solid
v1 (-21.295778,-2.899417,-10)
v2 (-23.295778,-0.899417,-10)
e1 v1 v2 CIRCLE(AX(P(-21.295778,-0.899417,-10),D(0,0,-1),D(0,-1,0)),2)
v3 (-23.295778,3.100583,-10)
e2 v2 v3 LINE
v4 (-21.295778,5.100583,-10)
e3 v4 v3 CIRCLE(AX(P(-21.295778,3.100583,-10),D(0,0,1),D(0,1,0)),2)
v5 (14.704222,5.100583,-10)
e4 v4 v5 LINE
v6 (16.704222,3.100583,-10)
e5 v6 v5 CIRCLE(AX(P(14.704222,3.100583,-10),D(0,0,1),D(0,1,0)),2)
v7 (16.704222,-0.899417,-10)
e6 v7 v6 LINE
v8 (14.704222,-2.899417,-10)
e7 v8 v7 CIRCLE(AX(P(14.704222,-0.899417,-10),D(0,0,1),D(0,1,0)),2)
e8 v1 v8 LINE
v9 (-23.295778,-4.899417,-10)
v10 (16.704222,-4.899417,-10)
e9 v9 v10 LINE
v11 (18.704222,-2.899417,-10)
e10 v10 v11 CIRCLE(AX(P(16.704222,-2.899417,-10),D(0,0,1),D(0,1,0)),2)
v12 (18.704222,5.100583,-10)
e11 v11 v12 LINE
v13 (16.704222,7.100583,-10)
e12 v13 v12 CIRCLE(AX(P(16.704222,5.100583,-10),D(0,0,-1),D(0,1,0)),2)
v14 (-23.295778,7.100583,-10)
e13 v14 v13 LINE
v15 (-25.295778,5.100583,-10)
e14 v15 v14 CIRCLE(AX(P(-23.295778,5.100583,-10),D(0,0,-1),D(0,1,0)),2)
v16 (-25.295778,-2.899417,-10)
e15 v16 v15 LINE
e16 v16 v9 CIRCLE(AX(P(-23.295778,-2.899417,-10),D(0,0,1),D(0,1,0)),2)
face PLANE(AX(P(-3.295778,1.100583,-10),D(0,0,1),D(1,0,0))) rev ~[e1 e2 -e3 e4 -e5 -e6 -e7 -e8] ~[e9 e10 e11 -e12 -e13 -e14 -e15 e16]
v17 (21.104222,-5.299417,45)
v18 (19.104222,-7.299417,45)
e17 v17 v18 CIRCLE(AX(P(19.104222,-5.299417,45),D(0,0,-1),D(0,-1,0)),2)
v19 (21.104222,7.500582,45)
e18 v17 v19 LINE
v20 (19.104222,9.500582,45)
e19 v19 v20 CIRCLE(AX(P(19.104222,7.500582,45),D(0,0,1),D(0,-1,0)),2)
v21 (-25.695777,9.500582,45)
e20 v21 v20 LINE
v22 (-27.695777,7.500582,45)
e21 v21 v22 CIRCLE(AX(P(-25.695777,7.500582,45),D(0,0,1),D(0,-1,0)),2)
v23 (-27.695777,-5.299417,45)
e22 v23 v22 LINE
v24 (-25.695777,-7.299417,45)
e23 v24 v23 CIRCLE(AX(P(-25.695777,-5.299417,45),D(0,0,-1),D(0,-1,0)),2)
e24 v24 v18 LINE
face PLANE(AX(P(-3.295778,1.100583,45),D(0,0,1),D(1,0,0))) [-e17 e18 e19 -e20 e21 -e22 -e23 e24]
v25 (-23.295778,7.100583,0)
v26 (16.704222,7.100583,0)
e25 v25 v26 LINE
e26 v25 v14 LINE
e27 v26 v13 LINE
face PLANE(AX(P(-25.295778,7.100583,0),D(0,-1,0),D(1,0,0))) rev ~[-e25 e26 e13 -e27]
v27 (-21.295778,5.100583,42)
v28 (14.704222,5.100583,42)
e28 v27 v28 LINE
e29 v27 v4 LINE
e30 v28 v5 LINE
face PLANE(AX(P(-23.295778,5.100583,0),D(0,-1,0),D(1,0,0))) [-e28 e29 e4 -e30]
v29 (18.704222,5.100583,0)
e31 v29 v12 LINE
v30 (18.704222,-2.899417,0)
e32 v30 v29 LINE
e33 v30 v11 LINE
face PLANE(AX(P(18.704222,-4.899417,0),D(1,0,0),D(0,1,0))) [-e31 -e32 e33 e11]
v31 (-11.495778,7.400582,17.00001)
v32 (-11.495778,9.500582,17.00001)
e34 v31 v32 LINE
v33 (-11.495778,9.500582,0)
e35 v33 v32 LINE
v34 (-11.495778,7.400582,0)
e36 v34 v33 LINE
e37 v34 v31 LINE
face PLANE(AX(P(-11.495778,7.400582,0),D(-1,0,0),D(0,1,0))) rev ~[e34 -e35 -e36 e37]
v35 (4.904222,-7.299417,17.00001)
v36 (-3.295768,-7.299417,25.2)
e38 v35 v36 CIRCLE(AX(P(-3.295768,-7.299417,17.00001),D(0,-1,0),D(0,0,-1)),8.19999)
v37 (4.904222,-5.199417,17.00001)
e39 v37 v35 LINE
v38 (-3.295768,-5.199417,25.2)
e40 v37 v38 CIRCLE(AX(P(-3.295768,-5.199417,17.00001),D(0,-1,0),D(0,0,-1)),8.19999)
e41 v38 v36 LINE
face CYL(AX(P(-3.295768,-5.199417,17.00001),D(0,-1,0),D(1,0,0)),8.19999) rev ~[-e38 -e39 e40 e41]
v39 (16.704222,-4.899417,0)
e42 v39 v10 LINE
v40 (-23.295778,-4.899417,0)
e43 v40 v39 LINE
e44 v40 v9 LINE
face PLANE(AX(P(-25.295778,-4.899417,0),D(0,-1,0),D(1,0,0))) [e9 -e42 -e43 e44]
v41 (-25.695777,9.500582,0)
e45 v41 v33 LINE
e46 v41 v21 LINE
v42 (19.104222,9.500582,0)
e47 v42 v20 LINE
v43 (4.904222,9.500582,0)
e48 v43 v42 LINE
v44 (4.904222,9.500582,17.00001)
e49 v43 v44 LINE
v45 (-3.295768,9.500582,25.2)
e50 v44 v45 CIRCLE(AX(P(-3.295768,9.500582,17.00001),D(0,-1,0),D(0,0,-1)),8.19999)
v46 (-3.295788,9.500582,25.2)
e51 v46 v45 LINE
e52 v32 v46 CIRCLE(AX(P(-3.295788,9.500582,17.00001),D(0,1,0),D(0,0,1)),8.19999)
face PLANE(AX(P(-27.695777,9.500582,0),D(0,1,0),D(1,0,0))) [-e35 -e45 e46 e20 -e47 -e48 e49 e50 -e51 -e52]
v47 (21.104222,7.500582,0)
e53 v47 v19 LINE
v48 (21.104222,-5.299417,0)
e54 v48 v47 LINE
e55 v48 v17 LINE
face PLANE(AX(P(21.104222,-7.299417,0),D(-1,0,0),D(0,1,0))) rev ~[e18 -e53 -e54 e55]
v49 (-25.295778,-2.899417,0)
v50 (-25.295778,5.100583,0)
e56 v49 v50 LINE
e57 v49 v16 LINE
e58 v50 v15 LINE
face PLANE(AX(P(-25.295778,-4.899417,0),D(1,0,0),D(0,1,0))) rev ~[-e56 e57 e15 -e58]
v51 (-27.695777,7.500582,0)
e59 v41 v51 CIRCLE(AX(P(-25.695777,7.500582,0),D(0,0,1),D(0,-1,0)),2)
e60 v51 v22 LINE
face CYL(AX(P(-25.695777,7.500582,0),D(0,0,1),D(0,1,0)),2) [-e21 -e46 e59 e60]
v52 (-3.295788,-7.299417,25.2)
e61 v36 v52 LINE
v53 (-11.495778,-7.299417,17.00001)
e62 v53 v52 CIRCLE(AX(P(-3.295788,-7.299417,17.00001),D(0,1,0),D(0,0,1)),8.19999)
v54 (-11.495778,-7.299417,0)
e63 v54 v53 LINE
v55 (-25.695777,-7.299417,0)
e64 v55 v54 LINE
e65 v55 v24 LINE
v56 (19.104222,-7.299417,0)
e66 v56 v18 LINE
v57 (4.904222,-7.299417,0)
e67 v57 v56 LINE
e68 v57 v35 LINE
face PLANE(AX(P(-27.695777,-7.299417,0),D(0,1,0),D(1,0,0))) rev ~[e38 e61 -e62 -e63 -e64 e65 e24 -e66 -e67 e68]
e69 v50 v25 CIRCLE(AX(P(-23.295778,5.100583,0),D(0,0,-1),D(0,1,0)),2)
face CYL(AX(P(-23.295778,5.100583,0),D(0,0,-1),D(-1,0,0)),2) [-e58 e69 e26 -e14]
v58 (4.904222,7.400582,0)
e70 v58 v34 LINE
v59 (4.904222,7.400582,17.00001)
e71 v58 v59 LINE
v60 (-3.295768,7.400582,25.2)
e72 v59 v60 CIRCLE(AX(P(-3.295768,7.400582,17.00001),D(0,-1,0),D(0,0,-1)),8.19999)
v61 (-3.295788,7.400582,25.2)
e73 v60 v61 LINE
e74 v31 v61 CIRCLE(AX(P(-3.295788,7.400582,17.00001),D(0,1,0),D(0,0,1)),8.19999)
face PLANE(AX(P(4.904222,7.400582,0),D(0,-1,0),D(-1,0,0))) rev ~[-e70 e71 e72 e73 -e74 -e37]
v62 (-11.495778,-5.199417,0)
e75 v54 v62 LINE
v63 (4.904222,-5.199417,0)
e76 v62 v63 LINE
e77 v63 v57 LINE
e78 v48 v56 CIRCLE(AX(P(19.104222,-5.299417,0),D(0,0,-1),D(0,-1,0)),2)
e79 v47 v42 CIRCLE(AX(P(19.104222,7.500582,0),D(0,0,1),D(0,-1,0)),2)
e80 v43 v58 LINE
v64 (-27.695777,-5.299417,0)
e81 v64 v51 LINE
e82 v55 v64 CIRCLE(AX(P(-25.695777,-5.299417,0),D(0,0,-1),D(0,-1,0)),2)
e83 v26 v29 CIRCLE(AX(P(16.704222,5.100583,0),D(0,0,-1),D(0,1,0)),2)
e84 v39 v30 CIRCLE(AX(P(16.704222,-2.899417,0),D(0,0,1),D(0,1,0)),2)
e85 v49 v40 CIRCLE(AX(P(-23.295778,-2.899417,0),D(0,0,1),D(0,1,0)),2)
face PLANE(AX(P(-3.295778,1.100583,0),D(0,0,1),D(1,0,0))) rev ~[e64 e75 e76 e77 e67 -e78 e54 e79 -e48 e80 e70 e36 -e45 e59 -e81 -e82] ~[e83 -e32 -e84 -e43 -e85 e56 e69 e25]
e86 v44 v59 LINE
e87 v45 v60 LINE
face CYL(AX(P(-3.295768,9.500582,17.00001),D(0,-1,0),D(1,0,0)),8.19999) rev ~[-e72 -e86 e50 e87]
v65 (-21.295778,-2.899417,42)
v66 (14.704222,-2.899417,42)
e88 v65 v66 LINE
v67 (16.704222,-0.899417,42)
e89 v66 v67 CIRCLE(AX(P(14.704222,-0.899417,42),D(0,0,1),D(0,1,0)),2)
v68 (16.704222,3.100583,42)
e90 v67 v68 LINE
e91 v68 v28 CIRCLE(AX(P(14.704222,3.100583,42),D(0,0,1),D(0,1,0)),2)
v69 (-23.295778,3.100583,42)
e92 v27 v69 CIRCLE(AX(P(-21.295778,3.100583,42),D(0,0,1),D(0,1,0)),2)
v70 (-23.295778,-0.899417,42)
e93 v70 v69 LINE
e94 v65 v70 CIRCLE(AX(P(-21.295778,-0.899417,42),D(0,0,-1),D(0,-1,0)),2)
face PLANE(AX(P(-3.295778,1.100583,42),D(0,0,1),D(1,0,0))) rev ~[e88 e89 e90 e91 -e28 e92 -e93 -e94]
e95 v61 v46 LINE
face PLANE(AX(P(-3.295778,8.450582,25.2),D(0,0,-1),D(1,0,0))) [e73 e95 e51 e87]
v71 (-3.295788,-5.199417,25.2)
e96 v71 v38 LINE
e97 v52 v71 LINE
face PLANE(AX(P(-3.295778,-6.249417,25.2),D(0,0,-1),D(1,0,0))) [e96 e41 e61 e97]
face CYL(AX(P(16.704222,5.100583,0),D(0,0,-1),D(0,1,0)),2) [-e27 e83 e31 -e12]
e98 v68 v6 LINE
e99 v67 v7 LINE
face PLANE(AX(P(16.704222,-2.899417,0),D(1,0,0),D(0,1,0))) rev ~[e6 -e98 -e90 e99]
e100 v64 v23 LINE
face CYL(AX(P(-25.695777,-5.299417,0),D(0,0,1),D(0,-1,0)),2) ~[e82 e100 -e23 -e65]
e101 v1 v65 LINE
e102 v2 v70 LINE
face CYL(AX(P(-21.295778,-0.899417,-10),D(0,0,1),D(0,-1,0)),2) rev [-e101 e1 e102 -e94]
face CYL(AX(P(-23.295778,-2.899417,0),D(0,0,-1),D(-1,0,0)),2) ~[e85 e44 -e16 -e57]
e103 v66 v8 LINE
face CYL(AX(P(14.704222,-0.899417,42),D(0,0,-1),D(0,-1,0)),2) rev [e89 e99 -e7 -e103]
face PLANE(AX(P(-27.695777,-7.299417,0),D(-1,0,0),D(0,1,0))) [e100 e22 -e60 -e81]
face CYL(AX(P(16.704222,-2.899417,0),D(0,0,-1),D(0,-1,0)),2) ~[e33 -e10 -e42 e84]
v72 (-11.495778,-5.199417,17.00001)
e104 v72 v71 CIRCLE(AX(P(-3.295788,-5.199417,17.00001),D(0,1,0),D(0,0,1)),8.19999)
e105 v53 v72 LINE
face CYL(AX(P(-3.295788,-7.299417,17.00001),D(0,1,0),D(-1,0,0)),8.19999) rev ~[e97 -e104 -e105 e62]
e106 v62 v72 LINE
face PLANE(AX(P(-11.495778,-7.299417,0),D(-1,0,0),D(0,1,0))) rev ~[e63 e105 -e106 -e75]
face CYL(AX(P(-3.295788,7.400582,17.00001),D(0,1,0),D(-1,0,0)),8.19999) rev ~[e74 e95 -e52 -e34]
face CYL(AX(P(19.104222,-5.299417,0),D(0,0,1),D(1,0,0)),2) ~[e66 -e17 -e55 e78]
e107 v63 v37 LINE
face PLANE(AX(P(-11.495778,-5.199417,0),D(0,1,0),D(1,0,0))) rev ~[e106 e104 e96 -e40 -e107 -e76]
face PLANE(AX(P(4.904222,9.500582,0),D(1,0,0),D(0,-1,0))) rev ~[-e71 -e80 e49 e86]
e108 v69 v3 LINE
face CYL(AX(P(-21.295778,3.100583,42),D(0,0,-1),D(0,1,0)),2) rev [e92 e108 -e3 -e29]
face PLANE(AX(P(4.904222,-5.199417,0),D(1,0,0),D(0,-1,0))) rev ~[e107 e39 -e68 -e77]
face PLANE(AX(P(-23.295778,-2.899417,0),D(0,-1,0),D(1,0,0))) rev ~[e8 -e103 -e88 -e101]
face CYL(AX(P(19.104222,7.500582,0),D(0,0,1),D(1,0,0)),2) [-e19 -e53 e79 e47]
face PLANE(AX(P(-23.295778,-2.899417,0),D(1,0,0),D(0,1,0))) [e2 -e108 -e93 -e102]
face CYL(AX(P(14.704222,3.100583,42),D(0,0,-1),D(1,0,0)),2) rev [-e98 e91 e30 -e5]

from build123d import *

# Parameters (mm, degrees)
F0_W     = 48.799998641
F0_H     = 16.799998641
F0_W_2   = 44.799998641
F0_H_2   = 12.799998641
F0_W_3   = 44
F0_H_3   = 12
F0_W_4   = 40
F0_H_4   = 8
F1_DEPTH = 45
F2_DEPTH = 42
F3_DEPTH = 10
F4_R     = 2
F5_R     = 2
F6_R     = 2
F8_DEPTH = 25.2
F9_R     = 8.19999


# Not quite as in the source:
# - a fillet or chamfer is up to 0.001 mm smaller than in the source, because OpenCascade refuses the exact size


with BuildPart() as f1:
    # F0 (on Top) → F1 (new body)
    with BuildSketch(Plane.XY):
        with Locations((-3.2957775742, 1.1005828176)):
            Rectangle(F0_W, F0_H)
        with Locations((-3.2957775742, 1.1005828176)):
            Rectangle(F0_W_2, F0_H_2, mode=Mode.SUBTRACT)
        with Locations((-3.2957775742, 1.1005828176)):
            Rectangle(F0_W_2, F0_H_2)
        with Locations((-3.2957775742, 1.1005828176)):
            Rectangle(F0_W_3, F0_H_3, mode=Mode.SUBTRACT)
        with Locations((-3.2957775742, 1.1005828176)):
            Rectangle(F0_W_3, F0_H_3)
        with Locations((-3.2957775742, 1.1005828176)):
            Rectangle(F0_W_4, F0_H_4, mode=Mode.SUBTRACT)
        with Locations((-3.2957775742, 1.1005828176)):
            Rectangle(F0_W_4, F0_H_4)
    extrude(amount=F1_DEPTH)

    # F0 (on Top) → F2 (cut)
    with BuildSketch(Plane.XY):
        with Locations((-3.2957775742, 1.1005828176)):
            Rectangle(F0_W_4, F0_H_4)
    extrude(amount=F2_DEPTH, mode=Mode.SUBTRACT)

    # F0 (on Top) → F3 (join)
    with BuildSketch(Plane.XY):
        with Locations((-3.2957775742, 1.1005828176)):
            Rectangle(F0_W_3, F0_H_3)
        with Locations((-3.2957775742, 1.1005828176)):
            Rectangle(F0_W_4, F0_H_4, mode=Mode.SUBTRACT)
    extrude(amount=-F3_DEPTH)

    # F4
    f4_edges = [f1.edges().sort_by_distance(p)[0] for p in [
        (-27.695777, -7.299417, 22.5),
        (-27.695777, 9.500582, 22.5),
        (21.104222, -7.299417, 22.5),
        (21.104222, 9.500582, 22.5),
    ]]
    fillet(f4_edges, radius=F4_R)

    # F5
    f5_edges = [f1.edges().sort_by_distance(p)[0] for p in [
        (-23.295778, 5.100583, 16),
        (-23.295778, -2.899417, 16),
        (16.704222, 5.100583, 16),
        (16.704222, -2.899417, 16),
    ]]
    fillet(f5_edges, radius=F5_R)

    # F6
    f6_edges = [f1.edges().sort_by_distance(p)[0] for p in [
        (18.704222, -4.899417, -5),
        (18.704222, 7.100583, -5),
        (-25.295778, -4.899417, -5),
        (-25.295778, 7.100583, -5),
    ]]
    fillet(f6_edges, radius=F6_R)

    # F7 (on face) → F8 (cut)
    with BuildSketch(Plane(origin=(0, 0, 0), x_dir=(1, 0, 0), z_dir=(0, 0, -1))):
        Polygon((4.9042224258, 7.2994165029), (-3.2957775742, 7.2994165029), (-11.4957775742, 7.2994165029), (-11.4957775742, 5.1994165029), (4.9042224258, 5.1994165029), align=None)
        Polygon((-3.2957775742, -9.5005821381), (4.9042224258, -9.5005821381), (4.9042224258, -7.4005821381), (-11.4957775742, -7.4005821381), (-11.4957775742, -9.5005821381), align=None)
    extrude(amount=-F8_DEPTH, mode=Mode.SUBTRACT)

    # F9 (radius 8.2 in the source; OpenCascade refuses exactly that, so slightly less here)
    f9_edges = [f1.edges().sort_by_distance(p)[0] for p in [
        (-11.495778, -6.249417, 25.2),
        (4.904222, -6.249417, 25.2),
        (4.904222, 8.450582, 25.2),
        (-11.495778, 8.450582, 25.2),
    ]]
    fillet(f9_edges, radius=F9_R)


solid = f1.part
